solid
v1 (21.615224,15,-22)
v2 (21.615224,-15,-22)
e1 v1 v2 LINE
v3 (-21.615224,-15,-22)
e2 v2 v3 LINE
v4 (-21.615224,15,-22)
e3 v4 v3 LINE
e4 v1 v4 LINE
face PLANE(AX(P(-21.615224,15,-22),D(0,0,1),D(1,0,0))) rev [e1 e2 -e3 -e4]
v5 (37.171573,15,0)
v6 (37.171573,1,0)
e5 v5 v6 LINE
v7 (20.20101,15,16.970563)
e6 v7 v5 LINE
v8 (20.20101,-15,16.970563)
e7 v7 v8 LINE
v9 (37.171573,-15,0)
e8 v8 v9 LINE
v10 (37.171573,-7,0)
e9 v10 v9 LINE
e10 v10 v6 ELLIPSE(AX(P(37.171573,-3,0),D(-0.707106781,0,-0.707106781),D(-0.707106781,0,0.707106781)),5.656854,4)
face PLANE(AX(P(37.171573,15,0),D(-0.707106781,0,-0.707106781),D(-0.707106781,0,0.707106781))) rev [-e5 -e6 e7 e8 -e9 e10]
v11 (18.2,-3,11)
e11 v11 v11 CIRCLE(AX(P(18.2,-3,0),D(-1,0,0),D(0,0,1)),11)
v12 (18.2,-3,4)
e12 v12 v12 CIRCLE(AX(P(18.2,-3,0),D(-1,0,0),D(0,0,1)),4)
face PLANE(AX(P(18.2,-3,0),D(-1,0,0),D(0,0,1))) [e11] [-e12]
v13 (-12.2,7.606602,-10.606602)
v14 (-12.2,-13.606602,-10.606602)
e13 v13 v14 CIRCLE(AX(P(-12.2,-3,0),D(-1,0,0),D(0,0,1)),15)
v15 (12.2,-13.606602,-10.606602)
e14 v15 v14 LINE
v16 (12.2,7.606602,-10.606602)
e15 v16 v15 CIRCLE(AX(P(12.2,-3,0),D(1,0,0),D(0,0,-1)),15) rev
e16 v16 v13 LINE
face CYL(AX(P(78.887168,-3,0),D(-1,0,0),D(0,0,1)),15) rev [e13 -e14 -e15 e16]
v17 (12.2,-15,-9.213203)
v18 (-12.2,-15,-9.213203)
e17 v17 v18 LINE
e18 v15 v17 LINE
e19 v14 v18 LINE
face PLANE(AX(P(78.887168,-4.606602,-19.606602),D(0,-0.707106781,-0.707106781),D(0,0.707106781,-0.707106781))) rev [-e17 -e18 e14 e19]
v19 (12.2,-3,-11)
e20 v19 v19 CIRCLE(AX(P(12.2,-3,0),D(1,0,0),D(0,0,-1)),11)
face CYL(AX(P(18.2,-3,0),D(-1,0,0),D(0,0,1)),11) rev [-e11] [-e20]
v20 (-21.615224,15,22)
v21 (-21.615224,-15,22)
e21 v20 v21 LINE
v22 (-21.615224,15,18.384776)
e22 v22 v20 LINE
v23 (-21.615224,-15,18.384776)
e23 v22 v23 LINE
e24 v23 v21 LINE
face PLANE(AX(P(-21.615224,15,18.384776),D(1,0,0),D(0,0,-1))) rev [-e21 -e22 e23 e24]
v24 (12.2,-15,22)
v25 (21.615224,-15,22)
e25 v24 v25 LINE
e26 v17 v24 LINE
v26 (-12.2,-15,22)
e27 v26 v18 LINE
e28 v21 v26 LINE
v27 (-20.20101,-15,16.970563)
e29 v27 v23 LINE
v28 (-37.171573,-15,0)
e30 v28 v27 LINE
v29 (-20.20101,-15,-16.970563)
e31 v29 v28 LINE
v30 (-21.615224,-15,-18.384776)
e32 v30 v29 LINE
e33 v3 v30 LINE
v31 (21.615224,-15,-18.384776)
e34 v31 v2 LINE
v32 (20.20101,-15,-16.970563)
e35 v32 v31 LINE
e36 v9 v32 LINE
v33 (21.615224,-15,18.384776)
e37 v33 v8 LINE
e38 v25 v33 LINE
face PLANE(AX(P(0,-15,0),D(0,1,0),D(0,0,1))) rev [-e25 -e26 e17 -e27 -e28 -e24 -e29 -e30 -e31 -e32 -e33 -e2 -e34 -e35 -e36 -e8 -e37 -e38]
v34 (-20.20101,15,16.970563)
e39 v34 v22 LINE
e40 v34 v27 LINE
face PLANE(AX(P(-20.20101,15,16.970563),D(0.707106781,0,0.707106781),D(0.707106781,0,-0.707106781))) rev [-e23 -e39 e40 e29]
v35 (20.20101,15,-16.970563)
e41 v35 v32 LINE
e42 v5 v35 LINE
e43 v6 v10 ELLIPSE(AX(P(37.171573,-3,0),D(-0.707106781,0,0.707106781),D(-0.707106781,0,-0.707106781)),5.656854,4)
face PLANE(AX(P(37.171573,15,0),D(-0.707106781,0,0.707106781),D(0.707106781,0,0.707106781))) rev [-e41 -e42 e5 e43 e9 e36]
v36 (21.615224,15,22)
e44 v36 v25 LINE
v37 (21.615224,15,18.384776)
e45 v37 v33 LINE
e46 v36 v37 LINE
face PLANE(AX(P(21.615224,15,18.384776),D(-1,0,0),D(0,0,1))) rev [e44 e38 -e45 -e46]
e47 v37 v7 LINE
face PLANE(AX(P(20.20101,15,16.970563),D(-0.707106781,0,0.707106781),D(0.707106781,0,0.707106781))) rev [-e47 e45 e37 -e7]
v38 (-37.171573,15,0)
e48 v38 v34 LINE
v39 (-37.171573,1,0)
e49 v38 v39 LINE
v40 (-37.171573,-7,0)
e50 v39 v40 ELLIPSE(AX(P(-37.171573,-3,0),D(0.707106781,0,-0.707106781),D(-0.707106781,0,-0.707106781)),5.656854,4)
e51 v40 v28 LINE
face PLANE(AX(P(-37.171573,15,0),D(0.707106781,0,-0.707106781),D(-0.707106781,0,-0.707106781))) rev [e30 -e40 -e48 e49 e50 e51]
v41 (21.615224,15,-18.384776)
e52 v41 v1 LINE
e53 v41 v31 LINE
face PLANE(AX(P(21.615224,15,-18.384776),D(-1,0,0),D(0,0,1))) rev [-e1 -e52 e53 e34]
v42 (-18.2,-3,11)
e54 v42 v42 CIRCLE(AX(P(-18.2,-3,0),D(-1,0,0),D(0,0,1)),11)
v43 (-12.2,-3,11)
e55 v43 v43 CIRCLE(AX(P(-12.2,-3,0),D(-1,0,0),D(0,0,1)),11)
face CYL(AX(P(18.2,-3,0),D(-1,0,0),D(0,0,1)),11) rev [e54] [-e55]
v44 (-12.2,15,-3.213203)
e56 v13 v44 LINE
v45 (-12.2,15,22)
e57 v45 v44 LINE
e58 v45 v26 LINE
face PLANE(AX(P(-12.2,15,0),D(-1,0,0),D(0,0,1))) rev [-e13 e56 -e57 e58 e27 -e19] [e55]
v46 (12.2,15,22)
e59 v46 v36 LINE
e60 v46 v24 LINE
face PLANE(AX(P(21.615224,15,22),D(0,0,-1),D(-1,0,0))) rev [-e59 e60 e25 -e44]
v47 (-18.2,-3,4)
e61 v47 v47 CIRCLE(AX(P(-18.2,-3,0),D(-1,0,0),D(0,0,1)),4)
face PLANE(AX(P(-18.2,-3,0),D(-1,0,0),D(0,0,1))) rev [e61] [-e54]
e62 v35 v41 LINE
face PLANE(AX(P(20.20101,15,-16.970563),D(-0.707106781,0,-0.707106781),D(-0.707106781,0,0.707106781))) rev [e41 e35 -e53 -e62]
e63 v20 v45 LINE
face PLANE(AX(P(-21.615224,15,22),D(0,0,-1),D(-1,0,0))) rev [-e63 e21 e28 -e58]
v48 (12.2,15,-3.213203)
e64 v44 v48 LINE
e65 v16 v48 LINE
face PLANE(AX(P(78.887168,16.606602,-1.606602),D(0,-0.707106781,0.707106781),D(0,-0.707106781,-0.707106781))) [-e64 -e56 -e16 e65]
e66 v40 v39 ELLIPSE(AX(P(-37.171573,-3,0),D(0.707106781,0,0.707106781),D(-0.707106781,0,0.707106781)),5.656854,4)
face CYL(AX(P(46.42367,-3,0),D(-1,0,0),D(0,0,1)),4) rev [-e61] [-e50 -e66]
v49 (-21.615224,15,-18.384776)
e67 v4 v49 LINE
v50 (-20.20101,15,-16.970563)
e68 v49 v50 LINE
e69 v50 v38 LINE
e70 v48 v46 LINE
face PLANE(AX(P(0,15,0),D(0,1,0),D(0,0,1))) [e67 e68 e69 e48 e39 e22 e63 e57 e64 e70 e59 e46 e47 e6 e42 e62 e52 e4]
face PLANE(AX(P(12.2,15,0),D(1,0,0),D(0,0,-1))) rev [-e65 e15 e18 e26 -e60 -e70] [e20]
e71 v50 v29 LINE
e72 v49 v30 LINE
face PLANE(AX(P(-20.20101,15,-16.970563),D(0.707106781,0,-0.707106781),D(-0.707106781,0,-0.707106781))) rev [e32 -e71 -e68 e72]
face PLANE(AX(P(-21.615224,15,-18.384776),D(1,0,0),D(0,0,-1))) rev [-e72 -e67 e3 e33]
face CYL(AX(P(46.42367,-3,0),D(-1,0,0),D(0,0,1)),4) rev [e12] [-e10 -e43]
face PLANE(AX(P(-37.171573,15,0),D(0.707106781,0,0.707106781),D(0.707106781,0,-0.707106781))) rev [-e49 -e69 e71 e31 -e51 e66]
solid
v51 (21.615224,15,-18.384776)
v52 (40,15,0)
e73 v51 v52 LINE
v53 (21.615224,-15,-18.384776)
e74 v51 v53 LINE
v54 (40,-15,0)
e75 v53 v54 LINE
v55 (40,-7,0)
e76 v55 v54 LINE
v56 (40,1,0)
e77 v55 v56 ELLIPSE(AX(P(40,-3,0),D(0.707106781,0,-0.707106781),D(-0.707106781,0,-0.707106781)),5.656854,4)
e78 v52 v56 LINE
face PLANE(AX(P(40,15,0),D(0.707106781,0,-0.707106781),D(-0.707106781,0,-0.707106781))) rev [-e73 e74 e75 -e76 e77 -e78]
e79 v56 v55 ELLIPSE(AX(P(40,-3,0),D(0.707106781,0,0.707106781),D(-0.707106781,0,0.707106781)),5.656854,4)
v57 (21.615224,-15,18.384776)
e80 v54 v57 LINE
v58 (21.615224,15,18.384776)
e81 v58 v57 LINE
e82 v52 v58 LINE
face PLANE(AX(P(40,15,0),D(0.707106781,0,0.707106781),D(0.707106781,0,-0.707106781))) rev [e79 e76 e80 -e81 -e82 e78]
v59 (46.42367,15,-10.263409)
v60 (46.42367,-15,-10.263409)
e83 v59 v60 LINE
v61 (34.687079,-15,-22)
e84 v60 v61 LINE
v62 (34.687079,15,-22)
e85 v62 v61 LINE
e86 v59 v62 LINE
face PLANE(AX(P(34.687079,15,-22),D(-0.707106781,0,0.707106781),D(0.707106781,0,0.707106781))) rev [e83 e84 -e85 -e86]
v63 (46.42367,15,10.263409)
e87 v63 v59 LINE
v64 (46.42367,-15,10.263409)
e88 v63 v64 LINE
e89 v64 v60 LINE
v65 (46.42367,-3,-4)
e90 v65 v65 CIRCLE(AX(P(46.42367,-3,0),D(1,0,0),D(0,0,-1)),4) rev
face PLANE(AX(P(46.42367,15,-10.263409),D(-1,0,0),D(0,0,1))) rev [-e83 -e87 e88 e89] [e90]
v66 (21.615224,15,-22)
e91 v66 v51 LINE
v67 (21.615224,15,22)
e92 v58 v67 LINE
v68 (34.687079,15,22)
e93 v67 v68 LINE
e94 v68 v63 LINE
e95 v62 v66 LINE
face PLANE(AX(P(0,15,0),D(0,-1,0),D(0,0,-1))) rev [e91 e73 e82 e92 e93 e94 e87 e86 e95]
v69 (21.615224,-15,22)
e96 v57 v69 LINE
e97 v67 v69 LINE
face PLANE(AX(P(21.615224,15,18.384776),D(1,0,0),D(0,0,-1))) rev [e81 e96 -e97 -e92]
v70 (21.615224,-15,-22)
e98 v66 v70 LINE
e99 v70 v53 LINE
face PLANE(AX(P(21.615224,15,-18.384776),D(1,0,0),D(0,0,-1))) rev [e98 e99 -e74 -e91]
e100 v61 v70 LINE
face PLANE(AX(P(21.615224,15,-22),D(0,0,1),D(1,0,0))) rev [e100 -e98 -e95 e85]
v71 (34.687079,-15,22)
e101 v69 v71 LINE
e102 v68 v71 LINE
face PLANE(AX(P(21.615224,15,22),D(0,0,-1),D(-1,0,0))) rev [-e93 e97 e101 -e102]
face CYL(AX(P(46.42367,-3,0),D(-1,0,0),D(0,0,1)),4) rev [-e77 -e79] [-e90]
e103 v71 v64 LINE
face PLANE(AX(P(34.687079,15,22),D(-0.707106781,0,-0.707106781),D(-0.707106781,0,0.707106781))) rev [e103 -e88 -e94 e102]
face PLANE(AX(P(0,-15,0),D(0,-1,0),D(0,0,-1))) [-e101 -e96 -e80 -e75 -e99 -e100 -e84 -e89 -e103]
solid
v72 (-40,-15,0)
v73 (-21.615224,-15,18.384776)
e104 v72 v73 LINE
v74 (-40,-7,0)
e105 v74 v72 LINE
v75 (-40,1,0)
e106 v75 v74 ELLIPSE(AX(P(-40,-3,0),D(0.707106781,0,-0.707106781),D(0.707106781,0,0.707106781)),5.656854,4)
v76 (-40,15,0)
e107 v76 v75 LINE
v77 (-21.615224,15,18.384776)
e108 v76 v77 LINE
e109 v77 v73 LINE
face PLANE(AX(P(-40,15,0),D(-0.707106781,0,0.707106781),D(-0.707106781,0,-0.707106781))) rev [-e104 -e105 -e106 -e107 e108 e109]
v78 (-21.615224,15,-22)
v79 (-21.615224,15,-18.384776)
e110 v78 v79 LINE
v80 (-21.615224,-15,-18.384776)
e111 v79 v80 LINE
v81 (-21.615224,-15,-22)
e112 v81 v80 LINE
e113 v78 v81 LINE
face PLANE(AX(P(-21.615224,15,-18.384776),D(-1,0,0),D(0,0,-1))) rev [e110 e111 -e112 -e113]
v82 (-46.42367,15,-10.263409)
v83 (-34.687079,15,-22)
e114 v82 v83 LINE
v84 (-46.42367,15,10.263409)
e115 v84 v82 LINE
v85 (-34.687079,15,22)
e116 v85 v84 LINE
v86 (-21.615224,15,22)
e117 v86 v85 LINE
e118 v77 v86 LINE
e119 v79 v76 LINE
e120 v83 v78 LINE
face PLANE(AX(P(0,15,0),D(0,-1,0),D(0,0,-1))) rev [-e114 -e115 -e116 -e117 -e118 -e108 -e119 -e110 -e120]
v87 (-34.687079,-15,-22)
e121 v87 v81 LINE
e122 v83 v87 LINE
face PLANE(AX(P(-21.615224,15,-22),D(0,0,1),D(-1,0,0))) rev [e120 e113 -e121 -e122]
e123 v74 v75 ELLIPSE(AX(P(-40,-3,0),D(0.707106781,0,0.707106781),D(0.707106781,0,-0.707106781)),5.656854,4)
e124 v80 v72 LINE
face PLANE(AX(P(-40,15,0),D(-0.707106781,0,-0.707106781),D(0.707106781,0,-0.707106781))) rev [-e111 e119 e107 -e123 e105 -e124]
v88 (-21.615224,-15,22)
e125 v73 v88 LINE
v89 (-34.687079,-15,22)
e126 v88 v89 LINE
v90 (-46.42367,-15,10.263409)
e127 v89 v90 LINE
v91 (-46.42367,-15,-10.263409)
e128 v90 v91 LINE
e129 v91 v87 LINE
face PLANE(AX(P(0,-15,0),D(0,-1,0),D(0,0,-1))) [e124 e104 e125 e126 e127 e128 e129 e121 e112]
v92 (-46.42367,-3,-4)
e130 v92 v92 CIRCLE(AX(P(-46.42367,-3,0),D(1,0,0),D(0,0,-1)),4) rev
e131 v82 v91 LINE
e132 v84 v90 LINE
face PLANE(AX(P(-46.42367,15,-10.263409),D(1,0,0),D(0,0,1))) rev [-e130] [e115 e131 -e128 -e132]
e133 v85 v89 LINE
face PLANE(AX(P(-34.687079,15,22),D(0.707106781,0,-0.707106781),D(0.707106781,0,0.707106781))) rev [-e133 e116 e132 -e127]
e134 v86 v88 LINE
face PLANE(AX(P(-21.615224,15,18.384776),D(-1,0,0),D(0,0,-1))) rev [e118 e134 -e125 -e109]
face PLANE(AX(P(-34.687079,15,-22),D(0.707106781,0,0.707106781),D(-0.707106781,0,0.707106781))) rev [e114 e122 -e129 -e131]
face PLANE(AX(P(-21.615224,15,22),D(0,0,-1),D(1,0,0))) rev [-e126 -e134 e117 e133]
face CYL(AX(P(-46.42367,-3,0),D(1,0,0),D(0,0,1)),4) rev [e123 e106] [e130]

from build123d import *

# Parameters (mm, degrees)
BOSS_EXTRUDE1_DEPTH     = 15
BOSS_EXTRUDE2_DEPTH     = 15
SKETCH5_R               = 11
SKETCH5_R_2             = 4
CUT_EXTRUDE1_DEPTH      = 18.2
CUT_EXTRUDE2_DEPTH      = 54.517820911
CUT_EXTRUDE2_DEPTH_BACK = 54.517820911
SKETCH5_2_R             = 4
CUT_EXTRUDE3_START      = -12.2
CUT_EXTRUDE3_DEPTH      = 24.4


# Read off the part's stored shape, not the designer's step: Cut-Extrude3
with BuildPart() as part:
    # Sketch3 → Boss-Extrude1 (new, symmetric)
    with BuildSketch(Plane(origin=(0, 0, 0), x_dir=(1, 0, 0), z_dir=(0, 1, 0))):
        Polygon((37.171572875, 0), (20.201010127, 16.970562748), (21.615223689, 18.384776311), (21.615223689, 22), (12.2, 22), (-12.2, 22), (-21.615223689, 22), (-21.615223689, 18.384776311), (-20.201010127, 16.970562748), (-37.171572875, 0), (-20.201010127, -16.970562748), (-21.615223689, -18.384776311), (-21.615223689, -22), (-12.2, -22), (-12.2, 0), (12.2, 0), (12.2, -22), (21.615223689, -22), (21.615223689, -18.384776311), (20.201010127, -16.970562748), align=None)
    extrude(amount=BOSS_EXTRUDE1_DEPTH, both=True)

    # Sketch5 → Cut-Extrude1 (cut, symmetric)
    with BuildSketch(Plane.ZY):
        with Locations((0, -3)):
            Circle(SKETCH5_R)
        with Locations((0, -3)):
            Circle(SKETCH5_R_2, mode=Mode.SUBTRACT)
    extrude(amount=CUT_EXTRUDE1_DEPTH, both=True, mode=Mode.SUBTRACT)


with BuildPart() as body_2:
    # Sketch4 → Boss-Extrude2 (new, symmetric)
    with BuildSketch(Plane(origin=(0, 0, 0), x_dir=(1, 0, 0), z_dir=(0, 1, 0))):
        Polygon((21.615223689, 18.384776311), (21.615223689, 22), (34.687078818, 22), (46.423670202, 10.263408616), (46.423670202, -10.263408616), (34.687078818, -22), (21.615223689, -22), (21.615223689, -18.384776311), (40, 0), align=None)
    extrude(amount=BOSS_EXTRUDE2_DEPTH, both=True)


with BuildPart() as cut_extrude2_tool:
    # Sketch5<2> → Cut-Extrude2 (new, two sides: drawn at the far end of the back side and taken through both)
    with BuildSketch(Plane.ZY.offset(-CUT_EXTRUDE2_DEPTH_BACK)):
        with Locations(Location((0, -3, 0), (0, 0, 90))):
            Circle(SKETCH5_2_R)
    extrude(amount=CUT_EXTRUDE2_DEPTH + CUT_EXTRUDE2_DEPTH_BACK)


with BuildPart() as part_1:
    add(part.part)

    # Cut-Extrude2: cut by cut_extrude2_tool
    add(cut_extrude2_tool.part, mode=Mode.SUBTRACT)

    # Cut-Extrude3 outline → Cut-Extrude3 (cut)
    with BuildSketch(Plane(origin=(0, 0, 0), x_dir=(0, 0, -1), z_dir=(1, 0, 0)).offset(CUT_EXTRUDE3_START)):
        with BuildLine():
            Line((0, -15), (9.213203436, -15))
            Line((9.213203436, -15), (10.606601718, -13.606601718))
            ThreePointArc((10.606601718, -13.606601718), (15, -3), (10.606601718, 7.606601718))
            Line((10.606601718, 7.606601718), (3.213203436, 15))
            Line((3.213203436, 15), (0, 15))
            Line((0, 15), (0, 8))
            ThreePointArc((0, 8), (11, -3), (0, -14))
            Line((0, -14), (0, -15))
        make_face()
    extrude(amount=CUT_EXTRUDE3_DEPTH, mode=Mode.SUBTRACT)


with BuildPart() as body_2_1:
    add(body_2.part)

    # Cut-Extrude2: cut by cut_extrude2_tool
    add(cut_extrude2_tool.part, mode=Mode.SUBTRACT)


with BuildPart() as body_3:
    # Mirror1: mirrored copy
    add(body_2_1.part.mirror(Plane(origin=(0, 0, 0), x_dir=(0, 0, 1), z_dir=(1, 0, 0))))


solid = Compound([part_1.part, body_2_1.part, body_3.part])
